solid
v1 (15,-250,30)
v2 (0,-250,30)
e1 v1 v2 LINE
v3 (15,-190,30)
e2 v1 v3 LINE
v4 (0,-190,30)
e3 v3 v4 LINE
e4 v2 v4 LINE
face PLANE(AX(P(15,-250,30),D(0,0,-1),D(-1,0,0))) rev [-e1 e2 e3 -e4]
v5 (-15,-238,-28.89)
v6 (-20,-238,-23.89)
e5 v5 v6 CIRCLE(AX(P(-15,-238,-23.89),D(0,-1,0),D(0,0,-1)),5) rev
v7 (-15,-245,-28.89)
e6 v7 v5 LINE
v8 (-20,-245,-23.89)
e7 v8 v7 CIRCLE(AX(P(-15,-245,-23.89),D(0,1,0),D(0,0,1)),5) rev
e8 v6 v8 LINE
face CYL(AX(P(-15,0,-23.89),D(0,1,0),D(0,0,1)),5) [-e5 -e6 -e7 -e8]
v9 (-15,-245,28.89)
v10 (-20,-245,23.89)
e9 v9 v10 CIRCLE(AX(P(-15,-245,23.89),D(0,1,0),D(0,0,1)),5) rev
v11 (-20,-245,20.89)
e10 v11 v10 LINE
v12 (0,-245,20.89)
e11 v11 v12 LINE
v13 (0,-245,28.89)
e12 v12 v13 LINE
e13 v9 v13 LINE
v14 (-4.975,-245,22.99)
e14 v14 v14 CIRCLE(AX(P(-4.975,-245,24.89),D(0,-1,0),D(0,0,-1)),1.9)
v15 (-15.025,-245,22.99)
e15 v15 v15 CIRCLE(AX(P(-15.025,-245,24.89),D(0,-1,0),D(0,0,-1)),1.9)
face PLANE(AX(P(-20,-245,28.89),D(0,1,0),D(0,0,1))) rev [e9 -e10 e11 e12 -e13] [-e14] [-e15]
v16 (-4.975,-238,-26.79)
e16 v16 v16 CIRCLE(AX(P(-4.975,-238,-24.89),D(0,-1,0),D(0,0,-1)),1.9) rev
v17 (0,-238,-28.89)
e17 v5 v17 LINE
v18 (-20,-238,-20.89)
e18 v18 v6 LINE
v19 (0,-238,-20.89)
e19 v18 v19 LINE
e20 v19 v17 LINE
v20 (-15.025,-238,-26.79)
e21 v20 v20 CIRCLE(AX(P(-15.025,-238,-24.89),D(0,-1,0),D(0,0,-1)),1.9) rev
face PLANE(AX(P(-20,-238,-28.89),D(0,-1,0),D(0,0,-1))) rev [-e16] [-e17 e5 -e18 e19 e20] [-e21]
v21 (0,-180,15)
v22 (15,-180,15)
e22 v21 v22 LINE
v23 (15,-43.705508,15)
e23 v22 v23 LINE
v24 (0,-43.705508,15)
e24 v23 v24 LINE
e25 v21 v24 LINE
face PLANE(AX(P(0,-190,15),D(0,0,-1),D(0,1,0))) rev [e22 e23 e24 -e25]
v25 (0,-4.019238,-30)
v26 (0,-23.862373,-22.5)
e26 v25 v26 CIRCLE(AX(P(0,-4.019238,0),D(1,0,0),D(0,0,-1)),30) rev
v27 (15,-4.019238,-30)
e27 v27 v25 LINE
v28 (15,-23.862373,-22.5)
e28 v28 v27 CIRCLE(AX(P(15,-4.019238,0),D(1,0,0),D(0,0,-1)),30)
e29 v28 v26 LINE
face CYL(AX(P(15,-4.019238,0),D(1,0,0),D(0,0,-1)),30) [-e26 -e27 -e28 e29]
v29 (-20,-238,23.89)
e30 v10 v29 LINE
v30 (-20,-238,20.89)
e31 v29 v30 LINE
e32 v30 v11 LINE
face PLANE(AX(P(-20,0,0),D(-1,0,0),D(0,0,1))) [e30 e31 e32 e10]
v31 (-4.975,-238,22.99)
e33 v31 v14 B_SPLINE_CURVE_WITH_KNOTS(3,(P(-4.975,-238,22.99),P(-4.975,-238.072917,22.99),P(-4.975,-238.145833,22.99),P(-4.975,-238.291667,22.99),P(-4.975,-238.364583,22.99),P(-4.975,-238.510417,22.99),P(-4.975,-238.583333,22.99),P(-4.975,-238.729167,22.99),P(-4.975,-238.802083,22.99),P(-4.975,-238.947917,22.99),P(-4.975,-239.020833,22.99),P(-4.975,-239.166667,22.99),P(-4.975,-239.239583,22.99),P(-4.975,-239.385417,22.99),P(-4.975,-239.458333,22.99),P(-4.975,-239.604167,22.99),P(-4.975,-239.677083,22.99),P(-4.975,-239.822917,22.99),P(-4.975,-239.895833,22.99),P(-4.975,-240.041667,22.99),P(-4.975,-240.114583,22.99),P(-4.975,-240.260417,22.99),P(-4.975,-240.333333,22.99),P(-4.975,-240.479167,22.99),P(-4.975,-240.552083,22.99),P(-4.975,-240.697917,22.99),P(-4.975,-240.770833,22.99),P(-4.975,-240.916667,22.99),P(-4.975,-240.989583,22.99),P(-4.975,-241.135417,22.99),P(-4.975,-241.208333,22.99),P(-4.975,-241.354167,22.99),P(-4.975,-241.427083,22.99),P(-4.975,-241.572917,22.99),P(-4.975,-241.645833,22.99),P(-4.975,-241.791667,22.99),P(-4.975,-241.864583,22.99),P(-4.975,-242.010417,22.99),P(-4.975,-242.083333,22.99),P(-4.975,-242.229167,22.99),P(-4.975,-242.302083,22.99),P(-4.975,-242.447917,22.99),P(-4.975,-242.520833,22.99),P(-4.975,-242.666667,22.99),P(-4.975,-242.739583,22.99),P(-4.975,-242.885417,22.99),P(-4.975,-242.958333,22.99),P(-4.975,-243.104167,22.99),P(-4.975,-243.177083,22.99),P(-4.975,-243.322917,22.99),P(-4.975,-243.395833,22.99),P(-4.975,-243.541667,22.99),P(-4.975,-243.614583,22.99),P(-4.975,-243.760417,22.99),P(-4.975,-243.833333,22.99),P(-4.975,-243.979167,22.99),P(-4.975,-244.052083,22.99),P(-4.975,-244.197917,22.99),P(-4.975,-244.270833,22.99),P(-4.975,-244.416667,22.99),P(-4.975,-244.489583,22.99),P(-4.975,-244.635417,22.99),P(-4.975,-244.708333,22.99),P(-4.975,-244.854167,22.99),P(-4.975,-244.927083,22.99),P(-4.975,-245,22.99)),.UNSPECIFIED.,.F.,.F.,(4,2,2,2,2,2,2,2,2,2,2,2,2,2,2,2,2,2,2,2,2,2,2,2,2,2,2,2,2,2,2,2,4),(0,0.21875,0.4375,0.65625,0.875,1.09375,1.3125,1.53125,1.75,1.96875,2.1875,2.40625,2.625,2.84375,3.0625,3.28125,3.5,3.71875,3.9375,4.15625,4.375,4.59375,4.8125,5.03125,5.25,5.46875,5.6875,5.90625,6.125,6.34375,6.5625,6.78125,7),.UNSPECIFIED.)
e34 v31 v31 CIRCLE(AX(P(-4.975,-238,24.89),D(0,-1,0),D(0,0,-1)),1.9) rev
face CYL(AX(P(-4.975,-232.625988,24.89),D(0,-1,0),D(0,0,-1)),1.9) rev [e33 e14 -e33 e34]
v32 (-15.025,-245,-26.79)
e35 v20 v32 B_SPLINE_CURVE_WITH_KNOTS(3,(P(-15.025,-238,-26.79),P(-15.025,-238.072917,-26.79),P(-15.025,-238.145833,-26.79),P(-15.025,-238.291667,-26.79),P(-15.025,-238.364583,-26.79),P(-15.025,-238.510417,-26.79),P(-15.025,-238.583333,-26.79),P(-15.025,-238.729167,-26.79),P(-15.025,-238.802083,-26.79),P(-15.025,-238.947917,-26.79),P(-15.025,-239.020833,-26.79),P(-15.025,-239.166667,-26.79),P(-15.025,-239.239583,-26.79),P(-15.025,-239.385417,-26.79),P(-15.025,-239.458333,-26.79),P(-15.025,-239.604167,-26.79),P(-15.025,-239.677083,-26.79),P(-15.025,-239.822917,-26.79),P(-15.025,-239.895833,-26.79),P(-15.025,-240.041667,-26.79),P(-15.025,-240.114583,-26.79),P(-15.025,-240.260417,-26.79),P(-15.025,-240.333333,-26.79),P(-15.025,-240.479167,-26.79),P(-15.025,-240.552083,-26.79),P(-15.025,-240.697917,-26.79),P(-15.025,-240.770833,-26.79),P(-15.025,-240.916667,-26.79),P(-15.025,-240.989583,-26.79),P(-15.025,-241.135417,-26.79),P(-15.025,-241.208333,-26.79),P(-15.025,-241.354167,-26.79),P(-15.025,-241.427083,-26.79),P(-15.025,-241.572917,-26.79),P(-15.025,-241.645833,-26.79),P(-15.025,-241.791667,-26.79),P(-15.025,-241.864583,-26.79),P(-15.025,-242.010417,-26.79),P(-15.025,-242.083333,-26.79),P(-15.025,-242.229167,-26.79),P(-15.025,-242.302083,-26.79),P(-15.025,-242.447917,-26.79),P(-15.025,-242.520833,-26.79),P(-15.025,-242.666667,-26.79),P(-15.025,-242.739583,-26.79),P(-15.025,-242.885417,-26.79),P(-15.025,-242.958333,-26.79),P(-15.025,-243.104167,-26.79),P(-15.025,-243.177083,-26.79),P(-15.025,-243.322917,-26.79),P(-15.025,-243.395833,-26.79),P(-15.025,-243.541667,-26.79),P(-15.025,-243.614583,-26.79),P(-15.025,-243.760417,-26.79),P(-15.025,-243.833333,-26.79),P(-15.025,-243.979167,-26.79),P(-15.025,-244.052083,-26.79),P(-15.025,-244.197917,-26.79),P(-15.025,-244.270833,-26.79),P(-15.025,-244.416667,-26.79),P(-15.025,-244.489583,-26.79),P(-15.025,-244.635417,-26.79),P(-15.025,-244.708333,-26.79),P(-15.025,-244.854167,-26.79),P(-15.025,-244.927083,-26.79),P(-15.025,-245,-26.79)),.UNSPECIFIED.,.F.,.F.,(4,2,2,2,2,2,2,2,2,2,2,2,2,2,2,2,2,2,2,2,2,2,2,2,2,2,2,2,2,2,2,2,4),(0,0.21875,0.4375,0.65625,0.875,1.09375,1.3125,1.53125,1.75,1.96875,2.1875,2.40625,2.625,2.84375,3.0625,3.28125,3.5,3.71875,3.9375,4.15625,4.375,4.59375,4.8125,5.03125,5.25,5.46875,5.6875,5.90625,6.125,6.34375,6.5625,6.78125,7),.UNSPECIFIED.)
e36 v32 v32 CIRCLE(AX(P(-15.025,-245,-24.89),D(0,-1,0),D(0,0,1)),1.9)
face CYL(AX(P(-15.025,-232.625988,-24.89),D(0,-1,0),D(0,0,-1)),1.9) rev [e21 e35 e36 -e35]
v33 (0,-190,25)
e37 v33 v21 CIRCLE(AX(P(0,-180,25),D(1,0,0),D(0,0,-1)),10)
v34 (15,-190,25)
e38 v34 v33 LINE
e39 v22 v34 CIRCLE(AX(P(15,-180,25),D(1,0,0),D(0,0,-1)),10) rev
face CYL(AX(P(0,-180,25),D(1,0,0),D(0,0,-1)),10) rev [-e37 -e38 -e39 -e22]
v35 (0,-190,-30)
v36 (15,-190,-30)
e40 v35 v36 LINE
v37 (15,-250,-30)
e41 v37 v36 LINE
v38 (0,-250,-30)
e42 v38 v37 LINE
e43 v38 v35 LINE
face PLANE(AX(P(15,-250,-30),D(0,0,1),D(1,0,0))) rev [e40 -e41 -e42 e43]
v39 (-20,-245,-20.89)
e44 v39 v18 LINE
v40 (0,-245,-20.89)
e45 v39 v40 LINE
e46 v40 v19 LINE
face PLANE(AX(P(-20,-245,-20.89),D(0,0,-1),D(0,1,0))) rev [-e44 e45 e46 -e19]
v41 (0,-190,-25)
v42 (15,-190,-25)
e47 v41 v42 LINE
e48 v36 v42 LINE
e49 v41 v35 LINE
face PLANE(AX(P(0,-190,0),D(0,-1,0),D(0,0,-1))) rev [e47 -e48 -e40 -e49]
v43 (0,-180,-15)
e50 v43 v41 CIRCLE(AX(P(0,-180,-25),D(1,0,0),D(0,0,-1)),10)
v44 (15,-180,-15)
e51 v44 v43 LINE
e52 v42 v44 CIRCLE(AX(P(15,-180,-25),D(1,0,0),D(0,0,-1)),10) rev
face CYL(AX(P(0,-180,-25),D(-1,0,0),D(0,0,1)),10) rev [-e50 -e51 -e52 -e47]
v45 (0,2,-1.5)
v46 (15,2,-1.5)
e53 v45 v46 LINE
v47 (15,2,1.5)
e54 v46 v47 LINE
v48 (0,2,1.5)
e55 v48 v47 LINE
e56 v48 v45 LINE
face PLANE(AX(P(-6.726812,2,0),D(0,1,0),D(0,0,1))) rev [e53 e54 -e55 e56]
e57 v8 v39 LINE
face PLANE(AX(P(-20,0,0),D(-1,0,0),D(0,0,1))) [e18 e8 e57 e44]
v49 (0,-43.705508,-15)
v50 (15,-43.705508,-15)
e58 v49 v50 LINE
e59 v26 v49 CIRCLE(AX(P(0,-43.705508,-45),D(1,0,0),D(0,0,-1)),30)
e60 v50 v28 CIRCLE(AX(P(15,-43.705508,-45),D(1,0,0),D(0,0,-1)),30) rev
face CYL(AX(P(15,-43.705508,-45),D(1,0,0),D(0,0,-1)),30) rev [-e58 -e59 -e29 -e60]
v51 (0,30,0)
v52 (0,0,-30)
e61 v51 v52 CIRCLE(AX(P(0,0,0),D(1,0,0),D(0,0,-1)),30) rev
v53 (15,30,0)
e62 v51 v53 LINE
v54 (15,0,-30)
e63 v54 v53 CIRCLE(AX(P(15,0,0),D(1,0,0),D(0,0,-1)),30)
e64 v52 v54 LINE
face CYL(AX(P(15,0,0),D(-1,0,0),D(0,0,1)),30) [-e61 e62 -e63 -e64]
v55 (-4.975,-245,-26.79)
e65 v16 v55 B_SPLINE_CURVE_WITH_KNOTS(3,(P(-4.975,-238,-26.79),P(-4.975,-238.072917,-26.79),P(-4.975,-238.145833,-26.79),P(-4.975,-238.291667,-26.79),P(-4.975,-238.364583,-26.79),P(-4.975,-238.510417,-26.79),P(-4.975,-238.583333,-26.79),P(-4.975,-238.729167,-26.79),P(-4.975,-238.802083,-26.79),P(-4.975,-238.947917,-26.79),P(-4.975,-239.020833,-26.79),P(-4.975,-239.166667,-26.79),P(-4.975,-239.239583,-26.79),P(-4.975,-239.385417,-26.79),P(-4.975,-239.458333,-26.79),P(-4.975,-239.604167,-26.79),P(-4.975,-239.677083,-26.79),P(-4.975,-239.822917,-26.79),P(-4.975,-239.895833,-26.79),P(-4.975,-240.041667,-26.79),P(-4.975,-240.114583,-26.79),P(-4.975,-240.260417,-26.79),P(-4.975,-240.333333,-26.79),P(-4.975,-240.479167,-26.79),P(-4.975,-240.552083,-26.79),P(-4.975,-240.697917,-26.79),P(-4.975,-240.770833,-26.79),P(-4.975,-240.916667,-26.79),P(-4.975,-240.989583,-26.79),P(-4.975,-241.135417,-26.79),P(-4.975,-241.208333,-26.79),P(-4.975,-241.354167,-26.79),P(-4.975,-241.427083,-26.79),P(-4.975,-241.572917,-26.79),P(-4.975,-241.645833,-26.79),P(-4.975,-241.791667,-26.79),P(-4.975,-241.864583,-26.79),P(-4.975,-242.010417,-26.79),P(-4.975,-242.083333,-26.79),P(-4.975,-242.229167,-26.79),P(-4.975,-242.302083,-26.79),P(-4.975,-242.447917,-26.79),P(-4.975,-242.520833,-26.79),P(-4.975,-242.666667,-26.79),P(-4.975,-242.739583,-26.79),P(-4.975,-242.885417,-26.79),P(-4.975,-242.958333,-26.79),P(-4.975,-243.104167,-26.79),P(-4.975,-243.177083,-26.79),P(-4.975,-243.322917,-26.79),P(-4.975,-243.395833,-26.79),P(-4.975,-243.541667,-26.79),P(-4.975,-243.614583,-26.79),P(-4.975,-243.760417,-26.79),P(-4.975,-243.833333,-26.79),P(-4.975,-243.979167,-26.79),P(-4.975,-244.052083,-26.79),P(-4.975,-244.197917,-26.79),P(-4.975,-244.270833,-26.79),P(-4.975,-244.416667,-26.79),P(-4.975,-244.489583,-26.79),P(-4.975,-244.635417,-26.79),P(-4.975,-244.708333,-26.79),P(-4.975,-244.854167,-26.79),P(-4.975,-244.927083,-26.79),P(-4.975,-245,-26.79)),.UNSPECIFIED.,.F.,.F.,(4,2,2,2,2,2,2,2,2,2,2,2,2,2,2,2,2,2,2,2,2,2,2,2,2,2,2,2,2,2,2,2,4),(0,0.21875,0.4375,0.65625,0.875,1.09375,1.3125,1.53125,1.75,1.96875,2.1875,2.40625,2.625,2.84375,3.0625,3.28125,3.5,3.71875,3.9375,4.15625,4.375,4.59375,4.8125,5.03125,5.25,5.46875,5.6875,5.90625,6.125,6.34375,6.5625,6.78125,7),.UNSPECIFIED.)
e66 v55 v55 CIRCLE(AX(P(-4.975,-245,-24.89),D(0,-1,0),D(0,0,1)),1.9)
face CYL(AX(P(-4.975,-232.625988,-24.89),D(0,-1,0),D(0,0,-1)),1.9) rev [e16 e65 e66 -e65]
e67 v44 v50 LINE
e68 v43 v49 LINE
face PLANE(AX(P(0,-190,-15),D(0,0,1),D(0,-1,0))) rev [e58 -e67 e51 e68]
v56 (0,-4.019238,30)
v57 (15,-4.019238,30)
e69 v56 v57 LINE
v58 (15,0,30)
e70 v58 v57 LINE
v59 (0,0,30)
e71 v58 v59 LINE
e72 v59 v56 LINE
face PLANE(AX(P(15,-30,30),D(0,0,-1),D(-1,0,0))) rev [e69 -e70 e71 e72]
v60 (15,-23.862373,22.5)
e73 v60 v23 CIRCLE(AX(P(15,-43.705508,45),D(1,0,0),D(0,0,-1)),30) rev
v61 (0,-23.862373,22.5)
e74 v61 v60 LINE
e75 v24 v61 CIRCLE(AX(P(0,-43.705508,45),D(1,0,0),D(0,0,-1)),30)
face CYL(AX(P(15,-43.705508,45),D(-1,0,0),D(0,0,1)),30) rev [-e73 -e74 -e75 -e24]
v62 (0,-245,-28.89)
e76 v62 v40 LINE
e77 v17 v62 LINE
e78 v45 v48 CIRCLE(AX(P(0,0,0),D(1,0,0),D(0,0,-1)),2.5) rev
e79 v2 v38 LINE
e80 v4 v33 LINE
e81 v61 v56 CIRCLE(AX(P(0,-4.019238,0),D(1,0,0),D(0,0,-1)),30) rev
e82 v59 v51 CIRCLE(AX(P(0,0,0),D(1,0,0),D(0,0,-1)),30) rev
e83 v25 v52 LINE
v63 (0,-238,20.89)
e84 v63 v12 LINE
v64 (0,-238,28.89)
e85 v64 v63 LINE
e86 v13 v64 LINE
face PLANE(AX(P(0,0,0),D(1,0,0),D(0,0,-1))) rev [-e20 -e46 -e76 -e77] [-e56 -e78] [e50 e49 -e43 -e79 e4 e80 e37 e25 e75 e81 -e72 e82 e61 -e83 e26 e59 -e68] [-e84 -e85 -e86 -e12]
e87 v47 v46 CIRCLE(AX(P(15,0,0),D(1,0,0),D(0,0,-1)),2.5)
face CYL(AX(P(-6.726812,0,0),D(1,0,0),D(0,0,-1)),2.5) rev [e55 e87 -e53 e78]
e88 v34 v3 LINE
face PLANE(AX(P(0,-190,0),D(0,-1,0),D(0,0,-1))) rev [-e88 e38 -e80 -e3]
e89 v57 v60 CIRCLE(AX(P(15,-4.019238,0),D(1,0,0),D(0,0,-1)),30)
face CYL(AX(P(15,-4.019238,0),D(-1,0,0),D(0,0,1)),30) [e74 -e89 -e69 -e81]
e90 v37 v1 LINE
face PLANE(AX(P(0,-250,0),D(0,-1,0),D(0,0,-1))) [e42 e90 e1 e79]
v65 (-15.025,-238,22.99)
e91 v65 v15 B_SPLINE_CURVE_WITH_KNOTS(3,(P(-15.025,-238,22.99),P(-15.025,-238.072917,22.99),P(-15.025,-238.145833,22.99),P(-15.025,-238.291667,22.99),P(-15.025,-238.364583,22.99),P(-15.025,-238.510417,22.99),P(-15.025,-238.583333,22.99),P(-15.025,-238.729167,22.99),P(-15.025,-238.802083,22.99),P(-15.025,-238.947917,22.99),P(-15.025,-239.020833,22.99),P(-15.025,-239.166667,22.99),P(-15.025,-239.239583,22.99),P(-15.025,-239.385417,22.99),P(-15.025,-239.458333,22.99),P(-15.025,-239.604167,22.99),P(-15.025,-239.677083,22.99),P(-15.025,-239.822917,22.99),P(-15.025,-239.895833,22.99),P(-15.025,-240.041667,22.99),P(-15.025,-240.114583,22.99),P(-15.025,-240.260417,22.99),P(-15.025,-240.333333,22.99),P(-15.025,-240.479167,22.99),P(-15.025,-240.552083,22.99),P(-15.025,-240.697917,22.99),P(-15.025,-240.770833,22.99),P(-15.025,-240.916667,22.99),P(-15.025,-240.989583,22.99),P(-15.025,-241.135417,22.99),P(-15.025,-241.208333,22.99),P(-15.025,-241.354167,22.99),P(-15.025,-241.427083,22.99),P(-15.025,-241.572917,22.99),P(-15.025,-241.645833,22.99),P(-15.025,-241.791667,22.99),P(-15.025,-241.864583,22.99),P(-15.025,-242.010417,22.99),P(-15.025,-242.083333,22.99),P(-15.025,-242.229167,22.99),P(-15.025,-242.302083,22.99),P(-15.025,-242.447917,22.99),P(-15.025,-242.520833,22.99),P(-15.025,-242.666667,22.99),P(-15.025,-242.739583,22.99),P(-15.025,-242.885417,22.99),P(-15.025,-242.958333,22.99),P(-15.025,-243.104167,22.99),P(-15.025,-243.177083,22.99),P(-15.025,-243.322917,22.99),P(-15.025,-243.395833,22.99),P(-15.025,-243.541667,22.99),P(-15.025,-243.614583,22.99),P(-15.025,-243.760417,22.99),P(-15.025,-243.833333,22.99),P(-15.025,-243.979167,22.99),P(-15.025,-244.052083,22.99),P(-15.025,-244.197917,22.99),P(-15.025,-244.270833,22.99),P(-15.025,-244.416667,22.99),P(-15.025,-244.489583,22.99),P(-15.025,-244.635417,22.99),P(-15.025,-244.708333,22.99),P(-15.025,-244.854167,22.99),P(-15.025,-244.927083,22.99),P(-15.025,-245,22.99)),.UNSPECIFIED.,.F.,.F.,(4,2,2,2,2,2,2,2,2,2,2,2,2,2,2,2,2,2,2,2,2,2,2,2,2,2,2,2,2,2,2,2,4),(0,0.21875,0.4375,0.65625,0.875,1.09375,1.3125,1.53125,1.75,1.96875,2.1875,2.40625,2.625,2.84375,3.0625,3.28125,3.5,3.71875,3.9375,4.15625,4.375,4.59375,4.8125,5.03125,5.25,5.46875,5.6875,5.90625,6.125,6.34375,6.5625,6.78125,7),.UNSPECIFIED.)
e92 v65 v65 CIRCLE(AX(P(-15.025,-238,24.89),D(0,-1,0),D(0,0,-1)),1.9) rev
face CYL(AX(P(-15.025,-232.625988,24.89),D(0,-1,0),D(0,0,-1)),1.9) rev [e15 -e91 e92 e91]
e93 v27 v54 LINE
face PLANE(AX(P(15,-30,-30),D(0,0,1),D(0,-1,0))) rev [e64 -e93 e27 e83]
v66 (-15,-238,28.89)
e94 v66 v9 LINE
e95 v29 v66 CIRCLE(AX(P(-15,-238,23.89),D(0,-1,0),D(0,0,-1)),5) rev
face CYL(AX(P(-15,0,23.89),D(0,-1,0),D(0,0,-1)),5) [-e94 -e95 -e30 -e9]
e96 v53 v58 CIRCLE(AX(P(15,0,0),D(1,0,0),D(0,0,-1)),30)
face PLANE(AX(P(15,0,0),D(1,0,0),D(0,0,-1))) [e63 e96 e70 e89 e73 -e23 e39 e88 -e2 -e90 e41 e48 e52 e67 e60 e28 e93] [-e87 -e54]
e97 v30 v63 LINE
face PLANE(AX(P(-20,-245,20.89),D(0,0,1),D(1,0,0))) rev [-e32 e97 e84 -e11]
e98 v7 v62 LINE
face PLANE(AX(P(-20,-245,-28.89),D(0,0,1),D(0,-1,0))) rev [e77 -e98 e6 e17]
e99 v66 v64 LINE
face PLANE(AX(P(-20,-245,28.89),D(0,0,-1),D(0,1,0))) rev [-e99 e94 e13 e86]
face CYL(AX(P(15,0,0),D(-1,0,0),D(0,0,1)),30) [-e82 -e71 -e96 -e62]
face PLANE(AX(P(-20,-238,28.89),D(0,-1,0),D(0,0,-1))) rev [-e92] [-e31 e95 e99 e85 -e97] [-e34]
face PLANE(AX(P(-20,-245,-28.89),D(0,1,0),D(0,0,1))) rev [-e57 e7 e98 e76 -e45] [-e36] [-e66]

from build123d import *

# Parameters (mm, degrees)
SKETCH1_W           = 60
SKETCH1_H           = 60
BOSS_EXTRUDE1_DEPTH = 15
CUT_EXTRUDE1_DEPTH  = 15
SKETCH8_W           = 15
SKETCH8_H           = 30
BOSS_EXTRUDE2_DEPTH = 160
BOSS_EXTRUDE3_DEPTH = 60
SKETCH10_W          = 8
SKETCH10_H          = 7
BOSS_EXTRUDE4_DEPTH = 20
SKETCH12_R          = 1.9
CUT_EXTRUDE2_DEPTH  = 7
FILLET1_R           = 30
FILLET2_R           = 30
FILLET4_R           = 10
FILLET5_R           = 5


with BuildPart() as part:
    # Sketch1 → Boss-Extrude1 (new body)
    with BuildSketch(Plane(origin=(0, 0, 0), x_dir=(0, 0, -1), z_dir=(1, 0, 0))):
        Rectangle(SKETCH1_W, SKETCH1_H)
    extrude(amount=BOSS_EXTRUDE1_DEPTH)

    # Sketch2 → Cut-Extrude1 (cut)
    with BuildSketch(Plane(origin=(15, 0, 0), x_dir=(0, 0, -1), z_dir=(1, 0, 0))):
        with BuildLine():
            ThreePointArc((2.5, 0), (2.236067977, 1.118033989), (1.5, 2))
            Line((1.5, 2), (-1.5, 2))
            ThreePointArc((-1.5, 2), (-1.118033989, -2.236067977), (2.5, 0))
        make_face()
    extrude(amount=-CUT_EXTRUDE1_DEPTH, mode=Mode.SUBTRACT)

    # Sketch8 → Boss-Extrude2 (add)
    with BuildSketch(Plane.XZ.offset(30)):
        with Locations((7.5, 0)):
            Rectangle(SKETCH8_W, SKETCH8_H)
    extrude(amount=BOSS_EXTRUDE2_DEPTH)

    # Sketch9 → Boss-Extrude3 (add)
    with BuildSketch(Plane.XZ.offset(190)):
        Polygon((0, 0), (0, 30), (15, 30), (15, -30), (0, -30), align=None)
    extrude(amount=BOSS_EXTRUDE3_DEPTH)

    # Sketch10 → Boss-Extrude4 (add)
    with BuildSketch(Plane.ZY):
        with Locations((24.89, -241.5)):
            Rectangle(SKETCH10_W, SKETCH10_H)
        with Locations((-24.89, -241.5)):
            Rectangle(SKETCH10_W, SKETCH10_H)
    extrude(amount=BOSS_EXTRUDE4_DEPTH)

    # Sketch12 → Cut-Extrude2 (cut)
    with BuildSketch(Plane.XZ.offset(245)):
        with Locations(Location((-15.025, 24.89, 0), (0, 0, 270))):
            Circle(SKETCH12_R)
        with Locations(Location((-4.975, 24.89, 0), (0, 0, 270))):
            Circle(SKETCH12_R)
        with Locations(Location((-4.975, -24.89, 0), (0, 0, 270))):
            Circle(SKETCH12_R)
        with Locations(Location((-15.025, -24.89, 0), (0, 0, 270))):
            Circle(SKETCH12_R)
    extrude(amount=-CUT_EXTRUDE2_DEPTH, mode=Mode.SUBTRACT)

    # Fillet1
    # the kernel refuses this fillet: 30 mm, written as the material it takes off along each edge
    with BuildSketch(Plane(origin=(-64.951905284, -30, -30), x_dir=(0, 0, 1), z_dir=(1, 0, 0))) as fillet1_piece_1:
        with BuildLine():
            CenterArc((30, -25.980762114), FILLET1_R, 120, 60)
            Line((0, -25.980762114), (-0.6, -25.980762114))
            Line((-0.6, -25.980762114), (-0.6, 0))
            Line((-0.6, 0), (0, 0.6))
            ThreePointArc((0, 0.6), (7.5, 0.6), (14.7, 0.519615242))
            Line((14.7, 0.519615242), (15, 0))
        make_face()
    extrude(amount=144.903810568, mode=Mode.SUBTRACT)
    with BuildSketch(Plane(origin=(-75, 30, -30), x_dir=(0, 0, 1), z_dir=(1, 0, 0)), Plane(origin=(-75, 30, 30), x_dir=(0, -1, 0), z_dir=(1, 0, 0))) as fillet1_piece_2:
        with BuildLine():
            CenterArc((FILLET1_R, FILLET1_R), FILLET1_R, 180, 90)
            Line((0, FILLET1_R), (-FILLET1_R * 0.02, FILLET1_R))
            Line((-FILLET1_R * 0.02, FILLET1_R), (-FILLET1_R * 0.02, -FILLET1_R * 0.02))
            Line((-FILLET1_R * 0.02, -FILLET1_R * 0.02), (FILLET1_R, -FILLET1_R * 0.02))
            Line((FILLET1_R, -FILLET1_R * 0.02), (FILLET1_R, 0))
        make_face()
    extrude(amount=165, mode=Mode.SUBTRACT)
    with BuildSketch(Plane(origin=(-64.951905284, -30, 30), x_dir=(0, 0, -1), z_dir=(1, 0, 0))) as fillet1_piece_3:
        with BuildLine():
            CenterArc((30, 25.980762114), FILLET1_R, 180, 60)
            Line((0, 25.980762114), (-0.6, 25.980762114))
            Line((-0.6, 25.980762114), (-0.6, 0))
            Line((-0.6, 0), (0, -0.6))
            ThreePointArc((0, -0.6), (7.5, -0.6), (14.7, -0.519615242))
            Line((14.7, -0.519615242), (15, 0))
        make_face()
    extrude(amount=144.903810568, mode=Mode.SUBTRACT)

    # Fillet2
    fillet2_edges = [part.edges().sort_by_distance(p)[0] for p in [
        (7.5, -30, -15),
        (7.5, -30, 15),
    ]]
    fillet(fillet2_edges, radius=FILLET2_R)

    # Fillet4
    fillet4_edges = [part.edges().sort_by_distance(p)[0] for p in [
        (7.5, -190, -15),
        (7.5, -190, 15),
    ]]
    fillet(fillet4_edges, radius=FILLET4_R)

    # Fillet5
    fillet5_edges = [part.edges().sort_by_distance(p)[0] for p in [
        (-20, -241.5, 28.89),
        (-20, -241.5, -28.89),
    ]]
    fillet(fillet5_edges, radius=FILLET5_R)


solid = part.part
